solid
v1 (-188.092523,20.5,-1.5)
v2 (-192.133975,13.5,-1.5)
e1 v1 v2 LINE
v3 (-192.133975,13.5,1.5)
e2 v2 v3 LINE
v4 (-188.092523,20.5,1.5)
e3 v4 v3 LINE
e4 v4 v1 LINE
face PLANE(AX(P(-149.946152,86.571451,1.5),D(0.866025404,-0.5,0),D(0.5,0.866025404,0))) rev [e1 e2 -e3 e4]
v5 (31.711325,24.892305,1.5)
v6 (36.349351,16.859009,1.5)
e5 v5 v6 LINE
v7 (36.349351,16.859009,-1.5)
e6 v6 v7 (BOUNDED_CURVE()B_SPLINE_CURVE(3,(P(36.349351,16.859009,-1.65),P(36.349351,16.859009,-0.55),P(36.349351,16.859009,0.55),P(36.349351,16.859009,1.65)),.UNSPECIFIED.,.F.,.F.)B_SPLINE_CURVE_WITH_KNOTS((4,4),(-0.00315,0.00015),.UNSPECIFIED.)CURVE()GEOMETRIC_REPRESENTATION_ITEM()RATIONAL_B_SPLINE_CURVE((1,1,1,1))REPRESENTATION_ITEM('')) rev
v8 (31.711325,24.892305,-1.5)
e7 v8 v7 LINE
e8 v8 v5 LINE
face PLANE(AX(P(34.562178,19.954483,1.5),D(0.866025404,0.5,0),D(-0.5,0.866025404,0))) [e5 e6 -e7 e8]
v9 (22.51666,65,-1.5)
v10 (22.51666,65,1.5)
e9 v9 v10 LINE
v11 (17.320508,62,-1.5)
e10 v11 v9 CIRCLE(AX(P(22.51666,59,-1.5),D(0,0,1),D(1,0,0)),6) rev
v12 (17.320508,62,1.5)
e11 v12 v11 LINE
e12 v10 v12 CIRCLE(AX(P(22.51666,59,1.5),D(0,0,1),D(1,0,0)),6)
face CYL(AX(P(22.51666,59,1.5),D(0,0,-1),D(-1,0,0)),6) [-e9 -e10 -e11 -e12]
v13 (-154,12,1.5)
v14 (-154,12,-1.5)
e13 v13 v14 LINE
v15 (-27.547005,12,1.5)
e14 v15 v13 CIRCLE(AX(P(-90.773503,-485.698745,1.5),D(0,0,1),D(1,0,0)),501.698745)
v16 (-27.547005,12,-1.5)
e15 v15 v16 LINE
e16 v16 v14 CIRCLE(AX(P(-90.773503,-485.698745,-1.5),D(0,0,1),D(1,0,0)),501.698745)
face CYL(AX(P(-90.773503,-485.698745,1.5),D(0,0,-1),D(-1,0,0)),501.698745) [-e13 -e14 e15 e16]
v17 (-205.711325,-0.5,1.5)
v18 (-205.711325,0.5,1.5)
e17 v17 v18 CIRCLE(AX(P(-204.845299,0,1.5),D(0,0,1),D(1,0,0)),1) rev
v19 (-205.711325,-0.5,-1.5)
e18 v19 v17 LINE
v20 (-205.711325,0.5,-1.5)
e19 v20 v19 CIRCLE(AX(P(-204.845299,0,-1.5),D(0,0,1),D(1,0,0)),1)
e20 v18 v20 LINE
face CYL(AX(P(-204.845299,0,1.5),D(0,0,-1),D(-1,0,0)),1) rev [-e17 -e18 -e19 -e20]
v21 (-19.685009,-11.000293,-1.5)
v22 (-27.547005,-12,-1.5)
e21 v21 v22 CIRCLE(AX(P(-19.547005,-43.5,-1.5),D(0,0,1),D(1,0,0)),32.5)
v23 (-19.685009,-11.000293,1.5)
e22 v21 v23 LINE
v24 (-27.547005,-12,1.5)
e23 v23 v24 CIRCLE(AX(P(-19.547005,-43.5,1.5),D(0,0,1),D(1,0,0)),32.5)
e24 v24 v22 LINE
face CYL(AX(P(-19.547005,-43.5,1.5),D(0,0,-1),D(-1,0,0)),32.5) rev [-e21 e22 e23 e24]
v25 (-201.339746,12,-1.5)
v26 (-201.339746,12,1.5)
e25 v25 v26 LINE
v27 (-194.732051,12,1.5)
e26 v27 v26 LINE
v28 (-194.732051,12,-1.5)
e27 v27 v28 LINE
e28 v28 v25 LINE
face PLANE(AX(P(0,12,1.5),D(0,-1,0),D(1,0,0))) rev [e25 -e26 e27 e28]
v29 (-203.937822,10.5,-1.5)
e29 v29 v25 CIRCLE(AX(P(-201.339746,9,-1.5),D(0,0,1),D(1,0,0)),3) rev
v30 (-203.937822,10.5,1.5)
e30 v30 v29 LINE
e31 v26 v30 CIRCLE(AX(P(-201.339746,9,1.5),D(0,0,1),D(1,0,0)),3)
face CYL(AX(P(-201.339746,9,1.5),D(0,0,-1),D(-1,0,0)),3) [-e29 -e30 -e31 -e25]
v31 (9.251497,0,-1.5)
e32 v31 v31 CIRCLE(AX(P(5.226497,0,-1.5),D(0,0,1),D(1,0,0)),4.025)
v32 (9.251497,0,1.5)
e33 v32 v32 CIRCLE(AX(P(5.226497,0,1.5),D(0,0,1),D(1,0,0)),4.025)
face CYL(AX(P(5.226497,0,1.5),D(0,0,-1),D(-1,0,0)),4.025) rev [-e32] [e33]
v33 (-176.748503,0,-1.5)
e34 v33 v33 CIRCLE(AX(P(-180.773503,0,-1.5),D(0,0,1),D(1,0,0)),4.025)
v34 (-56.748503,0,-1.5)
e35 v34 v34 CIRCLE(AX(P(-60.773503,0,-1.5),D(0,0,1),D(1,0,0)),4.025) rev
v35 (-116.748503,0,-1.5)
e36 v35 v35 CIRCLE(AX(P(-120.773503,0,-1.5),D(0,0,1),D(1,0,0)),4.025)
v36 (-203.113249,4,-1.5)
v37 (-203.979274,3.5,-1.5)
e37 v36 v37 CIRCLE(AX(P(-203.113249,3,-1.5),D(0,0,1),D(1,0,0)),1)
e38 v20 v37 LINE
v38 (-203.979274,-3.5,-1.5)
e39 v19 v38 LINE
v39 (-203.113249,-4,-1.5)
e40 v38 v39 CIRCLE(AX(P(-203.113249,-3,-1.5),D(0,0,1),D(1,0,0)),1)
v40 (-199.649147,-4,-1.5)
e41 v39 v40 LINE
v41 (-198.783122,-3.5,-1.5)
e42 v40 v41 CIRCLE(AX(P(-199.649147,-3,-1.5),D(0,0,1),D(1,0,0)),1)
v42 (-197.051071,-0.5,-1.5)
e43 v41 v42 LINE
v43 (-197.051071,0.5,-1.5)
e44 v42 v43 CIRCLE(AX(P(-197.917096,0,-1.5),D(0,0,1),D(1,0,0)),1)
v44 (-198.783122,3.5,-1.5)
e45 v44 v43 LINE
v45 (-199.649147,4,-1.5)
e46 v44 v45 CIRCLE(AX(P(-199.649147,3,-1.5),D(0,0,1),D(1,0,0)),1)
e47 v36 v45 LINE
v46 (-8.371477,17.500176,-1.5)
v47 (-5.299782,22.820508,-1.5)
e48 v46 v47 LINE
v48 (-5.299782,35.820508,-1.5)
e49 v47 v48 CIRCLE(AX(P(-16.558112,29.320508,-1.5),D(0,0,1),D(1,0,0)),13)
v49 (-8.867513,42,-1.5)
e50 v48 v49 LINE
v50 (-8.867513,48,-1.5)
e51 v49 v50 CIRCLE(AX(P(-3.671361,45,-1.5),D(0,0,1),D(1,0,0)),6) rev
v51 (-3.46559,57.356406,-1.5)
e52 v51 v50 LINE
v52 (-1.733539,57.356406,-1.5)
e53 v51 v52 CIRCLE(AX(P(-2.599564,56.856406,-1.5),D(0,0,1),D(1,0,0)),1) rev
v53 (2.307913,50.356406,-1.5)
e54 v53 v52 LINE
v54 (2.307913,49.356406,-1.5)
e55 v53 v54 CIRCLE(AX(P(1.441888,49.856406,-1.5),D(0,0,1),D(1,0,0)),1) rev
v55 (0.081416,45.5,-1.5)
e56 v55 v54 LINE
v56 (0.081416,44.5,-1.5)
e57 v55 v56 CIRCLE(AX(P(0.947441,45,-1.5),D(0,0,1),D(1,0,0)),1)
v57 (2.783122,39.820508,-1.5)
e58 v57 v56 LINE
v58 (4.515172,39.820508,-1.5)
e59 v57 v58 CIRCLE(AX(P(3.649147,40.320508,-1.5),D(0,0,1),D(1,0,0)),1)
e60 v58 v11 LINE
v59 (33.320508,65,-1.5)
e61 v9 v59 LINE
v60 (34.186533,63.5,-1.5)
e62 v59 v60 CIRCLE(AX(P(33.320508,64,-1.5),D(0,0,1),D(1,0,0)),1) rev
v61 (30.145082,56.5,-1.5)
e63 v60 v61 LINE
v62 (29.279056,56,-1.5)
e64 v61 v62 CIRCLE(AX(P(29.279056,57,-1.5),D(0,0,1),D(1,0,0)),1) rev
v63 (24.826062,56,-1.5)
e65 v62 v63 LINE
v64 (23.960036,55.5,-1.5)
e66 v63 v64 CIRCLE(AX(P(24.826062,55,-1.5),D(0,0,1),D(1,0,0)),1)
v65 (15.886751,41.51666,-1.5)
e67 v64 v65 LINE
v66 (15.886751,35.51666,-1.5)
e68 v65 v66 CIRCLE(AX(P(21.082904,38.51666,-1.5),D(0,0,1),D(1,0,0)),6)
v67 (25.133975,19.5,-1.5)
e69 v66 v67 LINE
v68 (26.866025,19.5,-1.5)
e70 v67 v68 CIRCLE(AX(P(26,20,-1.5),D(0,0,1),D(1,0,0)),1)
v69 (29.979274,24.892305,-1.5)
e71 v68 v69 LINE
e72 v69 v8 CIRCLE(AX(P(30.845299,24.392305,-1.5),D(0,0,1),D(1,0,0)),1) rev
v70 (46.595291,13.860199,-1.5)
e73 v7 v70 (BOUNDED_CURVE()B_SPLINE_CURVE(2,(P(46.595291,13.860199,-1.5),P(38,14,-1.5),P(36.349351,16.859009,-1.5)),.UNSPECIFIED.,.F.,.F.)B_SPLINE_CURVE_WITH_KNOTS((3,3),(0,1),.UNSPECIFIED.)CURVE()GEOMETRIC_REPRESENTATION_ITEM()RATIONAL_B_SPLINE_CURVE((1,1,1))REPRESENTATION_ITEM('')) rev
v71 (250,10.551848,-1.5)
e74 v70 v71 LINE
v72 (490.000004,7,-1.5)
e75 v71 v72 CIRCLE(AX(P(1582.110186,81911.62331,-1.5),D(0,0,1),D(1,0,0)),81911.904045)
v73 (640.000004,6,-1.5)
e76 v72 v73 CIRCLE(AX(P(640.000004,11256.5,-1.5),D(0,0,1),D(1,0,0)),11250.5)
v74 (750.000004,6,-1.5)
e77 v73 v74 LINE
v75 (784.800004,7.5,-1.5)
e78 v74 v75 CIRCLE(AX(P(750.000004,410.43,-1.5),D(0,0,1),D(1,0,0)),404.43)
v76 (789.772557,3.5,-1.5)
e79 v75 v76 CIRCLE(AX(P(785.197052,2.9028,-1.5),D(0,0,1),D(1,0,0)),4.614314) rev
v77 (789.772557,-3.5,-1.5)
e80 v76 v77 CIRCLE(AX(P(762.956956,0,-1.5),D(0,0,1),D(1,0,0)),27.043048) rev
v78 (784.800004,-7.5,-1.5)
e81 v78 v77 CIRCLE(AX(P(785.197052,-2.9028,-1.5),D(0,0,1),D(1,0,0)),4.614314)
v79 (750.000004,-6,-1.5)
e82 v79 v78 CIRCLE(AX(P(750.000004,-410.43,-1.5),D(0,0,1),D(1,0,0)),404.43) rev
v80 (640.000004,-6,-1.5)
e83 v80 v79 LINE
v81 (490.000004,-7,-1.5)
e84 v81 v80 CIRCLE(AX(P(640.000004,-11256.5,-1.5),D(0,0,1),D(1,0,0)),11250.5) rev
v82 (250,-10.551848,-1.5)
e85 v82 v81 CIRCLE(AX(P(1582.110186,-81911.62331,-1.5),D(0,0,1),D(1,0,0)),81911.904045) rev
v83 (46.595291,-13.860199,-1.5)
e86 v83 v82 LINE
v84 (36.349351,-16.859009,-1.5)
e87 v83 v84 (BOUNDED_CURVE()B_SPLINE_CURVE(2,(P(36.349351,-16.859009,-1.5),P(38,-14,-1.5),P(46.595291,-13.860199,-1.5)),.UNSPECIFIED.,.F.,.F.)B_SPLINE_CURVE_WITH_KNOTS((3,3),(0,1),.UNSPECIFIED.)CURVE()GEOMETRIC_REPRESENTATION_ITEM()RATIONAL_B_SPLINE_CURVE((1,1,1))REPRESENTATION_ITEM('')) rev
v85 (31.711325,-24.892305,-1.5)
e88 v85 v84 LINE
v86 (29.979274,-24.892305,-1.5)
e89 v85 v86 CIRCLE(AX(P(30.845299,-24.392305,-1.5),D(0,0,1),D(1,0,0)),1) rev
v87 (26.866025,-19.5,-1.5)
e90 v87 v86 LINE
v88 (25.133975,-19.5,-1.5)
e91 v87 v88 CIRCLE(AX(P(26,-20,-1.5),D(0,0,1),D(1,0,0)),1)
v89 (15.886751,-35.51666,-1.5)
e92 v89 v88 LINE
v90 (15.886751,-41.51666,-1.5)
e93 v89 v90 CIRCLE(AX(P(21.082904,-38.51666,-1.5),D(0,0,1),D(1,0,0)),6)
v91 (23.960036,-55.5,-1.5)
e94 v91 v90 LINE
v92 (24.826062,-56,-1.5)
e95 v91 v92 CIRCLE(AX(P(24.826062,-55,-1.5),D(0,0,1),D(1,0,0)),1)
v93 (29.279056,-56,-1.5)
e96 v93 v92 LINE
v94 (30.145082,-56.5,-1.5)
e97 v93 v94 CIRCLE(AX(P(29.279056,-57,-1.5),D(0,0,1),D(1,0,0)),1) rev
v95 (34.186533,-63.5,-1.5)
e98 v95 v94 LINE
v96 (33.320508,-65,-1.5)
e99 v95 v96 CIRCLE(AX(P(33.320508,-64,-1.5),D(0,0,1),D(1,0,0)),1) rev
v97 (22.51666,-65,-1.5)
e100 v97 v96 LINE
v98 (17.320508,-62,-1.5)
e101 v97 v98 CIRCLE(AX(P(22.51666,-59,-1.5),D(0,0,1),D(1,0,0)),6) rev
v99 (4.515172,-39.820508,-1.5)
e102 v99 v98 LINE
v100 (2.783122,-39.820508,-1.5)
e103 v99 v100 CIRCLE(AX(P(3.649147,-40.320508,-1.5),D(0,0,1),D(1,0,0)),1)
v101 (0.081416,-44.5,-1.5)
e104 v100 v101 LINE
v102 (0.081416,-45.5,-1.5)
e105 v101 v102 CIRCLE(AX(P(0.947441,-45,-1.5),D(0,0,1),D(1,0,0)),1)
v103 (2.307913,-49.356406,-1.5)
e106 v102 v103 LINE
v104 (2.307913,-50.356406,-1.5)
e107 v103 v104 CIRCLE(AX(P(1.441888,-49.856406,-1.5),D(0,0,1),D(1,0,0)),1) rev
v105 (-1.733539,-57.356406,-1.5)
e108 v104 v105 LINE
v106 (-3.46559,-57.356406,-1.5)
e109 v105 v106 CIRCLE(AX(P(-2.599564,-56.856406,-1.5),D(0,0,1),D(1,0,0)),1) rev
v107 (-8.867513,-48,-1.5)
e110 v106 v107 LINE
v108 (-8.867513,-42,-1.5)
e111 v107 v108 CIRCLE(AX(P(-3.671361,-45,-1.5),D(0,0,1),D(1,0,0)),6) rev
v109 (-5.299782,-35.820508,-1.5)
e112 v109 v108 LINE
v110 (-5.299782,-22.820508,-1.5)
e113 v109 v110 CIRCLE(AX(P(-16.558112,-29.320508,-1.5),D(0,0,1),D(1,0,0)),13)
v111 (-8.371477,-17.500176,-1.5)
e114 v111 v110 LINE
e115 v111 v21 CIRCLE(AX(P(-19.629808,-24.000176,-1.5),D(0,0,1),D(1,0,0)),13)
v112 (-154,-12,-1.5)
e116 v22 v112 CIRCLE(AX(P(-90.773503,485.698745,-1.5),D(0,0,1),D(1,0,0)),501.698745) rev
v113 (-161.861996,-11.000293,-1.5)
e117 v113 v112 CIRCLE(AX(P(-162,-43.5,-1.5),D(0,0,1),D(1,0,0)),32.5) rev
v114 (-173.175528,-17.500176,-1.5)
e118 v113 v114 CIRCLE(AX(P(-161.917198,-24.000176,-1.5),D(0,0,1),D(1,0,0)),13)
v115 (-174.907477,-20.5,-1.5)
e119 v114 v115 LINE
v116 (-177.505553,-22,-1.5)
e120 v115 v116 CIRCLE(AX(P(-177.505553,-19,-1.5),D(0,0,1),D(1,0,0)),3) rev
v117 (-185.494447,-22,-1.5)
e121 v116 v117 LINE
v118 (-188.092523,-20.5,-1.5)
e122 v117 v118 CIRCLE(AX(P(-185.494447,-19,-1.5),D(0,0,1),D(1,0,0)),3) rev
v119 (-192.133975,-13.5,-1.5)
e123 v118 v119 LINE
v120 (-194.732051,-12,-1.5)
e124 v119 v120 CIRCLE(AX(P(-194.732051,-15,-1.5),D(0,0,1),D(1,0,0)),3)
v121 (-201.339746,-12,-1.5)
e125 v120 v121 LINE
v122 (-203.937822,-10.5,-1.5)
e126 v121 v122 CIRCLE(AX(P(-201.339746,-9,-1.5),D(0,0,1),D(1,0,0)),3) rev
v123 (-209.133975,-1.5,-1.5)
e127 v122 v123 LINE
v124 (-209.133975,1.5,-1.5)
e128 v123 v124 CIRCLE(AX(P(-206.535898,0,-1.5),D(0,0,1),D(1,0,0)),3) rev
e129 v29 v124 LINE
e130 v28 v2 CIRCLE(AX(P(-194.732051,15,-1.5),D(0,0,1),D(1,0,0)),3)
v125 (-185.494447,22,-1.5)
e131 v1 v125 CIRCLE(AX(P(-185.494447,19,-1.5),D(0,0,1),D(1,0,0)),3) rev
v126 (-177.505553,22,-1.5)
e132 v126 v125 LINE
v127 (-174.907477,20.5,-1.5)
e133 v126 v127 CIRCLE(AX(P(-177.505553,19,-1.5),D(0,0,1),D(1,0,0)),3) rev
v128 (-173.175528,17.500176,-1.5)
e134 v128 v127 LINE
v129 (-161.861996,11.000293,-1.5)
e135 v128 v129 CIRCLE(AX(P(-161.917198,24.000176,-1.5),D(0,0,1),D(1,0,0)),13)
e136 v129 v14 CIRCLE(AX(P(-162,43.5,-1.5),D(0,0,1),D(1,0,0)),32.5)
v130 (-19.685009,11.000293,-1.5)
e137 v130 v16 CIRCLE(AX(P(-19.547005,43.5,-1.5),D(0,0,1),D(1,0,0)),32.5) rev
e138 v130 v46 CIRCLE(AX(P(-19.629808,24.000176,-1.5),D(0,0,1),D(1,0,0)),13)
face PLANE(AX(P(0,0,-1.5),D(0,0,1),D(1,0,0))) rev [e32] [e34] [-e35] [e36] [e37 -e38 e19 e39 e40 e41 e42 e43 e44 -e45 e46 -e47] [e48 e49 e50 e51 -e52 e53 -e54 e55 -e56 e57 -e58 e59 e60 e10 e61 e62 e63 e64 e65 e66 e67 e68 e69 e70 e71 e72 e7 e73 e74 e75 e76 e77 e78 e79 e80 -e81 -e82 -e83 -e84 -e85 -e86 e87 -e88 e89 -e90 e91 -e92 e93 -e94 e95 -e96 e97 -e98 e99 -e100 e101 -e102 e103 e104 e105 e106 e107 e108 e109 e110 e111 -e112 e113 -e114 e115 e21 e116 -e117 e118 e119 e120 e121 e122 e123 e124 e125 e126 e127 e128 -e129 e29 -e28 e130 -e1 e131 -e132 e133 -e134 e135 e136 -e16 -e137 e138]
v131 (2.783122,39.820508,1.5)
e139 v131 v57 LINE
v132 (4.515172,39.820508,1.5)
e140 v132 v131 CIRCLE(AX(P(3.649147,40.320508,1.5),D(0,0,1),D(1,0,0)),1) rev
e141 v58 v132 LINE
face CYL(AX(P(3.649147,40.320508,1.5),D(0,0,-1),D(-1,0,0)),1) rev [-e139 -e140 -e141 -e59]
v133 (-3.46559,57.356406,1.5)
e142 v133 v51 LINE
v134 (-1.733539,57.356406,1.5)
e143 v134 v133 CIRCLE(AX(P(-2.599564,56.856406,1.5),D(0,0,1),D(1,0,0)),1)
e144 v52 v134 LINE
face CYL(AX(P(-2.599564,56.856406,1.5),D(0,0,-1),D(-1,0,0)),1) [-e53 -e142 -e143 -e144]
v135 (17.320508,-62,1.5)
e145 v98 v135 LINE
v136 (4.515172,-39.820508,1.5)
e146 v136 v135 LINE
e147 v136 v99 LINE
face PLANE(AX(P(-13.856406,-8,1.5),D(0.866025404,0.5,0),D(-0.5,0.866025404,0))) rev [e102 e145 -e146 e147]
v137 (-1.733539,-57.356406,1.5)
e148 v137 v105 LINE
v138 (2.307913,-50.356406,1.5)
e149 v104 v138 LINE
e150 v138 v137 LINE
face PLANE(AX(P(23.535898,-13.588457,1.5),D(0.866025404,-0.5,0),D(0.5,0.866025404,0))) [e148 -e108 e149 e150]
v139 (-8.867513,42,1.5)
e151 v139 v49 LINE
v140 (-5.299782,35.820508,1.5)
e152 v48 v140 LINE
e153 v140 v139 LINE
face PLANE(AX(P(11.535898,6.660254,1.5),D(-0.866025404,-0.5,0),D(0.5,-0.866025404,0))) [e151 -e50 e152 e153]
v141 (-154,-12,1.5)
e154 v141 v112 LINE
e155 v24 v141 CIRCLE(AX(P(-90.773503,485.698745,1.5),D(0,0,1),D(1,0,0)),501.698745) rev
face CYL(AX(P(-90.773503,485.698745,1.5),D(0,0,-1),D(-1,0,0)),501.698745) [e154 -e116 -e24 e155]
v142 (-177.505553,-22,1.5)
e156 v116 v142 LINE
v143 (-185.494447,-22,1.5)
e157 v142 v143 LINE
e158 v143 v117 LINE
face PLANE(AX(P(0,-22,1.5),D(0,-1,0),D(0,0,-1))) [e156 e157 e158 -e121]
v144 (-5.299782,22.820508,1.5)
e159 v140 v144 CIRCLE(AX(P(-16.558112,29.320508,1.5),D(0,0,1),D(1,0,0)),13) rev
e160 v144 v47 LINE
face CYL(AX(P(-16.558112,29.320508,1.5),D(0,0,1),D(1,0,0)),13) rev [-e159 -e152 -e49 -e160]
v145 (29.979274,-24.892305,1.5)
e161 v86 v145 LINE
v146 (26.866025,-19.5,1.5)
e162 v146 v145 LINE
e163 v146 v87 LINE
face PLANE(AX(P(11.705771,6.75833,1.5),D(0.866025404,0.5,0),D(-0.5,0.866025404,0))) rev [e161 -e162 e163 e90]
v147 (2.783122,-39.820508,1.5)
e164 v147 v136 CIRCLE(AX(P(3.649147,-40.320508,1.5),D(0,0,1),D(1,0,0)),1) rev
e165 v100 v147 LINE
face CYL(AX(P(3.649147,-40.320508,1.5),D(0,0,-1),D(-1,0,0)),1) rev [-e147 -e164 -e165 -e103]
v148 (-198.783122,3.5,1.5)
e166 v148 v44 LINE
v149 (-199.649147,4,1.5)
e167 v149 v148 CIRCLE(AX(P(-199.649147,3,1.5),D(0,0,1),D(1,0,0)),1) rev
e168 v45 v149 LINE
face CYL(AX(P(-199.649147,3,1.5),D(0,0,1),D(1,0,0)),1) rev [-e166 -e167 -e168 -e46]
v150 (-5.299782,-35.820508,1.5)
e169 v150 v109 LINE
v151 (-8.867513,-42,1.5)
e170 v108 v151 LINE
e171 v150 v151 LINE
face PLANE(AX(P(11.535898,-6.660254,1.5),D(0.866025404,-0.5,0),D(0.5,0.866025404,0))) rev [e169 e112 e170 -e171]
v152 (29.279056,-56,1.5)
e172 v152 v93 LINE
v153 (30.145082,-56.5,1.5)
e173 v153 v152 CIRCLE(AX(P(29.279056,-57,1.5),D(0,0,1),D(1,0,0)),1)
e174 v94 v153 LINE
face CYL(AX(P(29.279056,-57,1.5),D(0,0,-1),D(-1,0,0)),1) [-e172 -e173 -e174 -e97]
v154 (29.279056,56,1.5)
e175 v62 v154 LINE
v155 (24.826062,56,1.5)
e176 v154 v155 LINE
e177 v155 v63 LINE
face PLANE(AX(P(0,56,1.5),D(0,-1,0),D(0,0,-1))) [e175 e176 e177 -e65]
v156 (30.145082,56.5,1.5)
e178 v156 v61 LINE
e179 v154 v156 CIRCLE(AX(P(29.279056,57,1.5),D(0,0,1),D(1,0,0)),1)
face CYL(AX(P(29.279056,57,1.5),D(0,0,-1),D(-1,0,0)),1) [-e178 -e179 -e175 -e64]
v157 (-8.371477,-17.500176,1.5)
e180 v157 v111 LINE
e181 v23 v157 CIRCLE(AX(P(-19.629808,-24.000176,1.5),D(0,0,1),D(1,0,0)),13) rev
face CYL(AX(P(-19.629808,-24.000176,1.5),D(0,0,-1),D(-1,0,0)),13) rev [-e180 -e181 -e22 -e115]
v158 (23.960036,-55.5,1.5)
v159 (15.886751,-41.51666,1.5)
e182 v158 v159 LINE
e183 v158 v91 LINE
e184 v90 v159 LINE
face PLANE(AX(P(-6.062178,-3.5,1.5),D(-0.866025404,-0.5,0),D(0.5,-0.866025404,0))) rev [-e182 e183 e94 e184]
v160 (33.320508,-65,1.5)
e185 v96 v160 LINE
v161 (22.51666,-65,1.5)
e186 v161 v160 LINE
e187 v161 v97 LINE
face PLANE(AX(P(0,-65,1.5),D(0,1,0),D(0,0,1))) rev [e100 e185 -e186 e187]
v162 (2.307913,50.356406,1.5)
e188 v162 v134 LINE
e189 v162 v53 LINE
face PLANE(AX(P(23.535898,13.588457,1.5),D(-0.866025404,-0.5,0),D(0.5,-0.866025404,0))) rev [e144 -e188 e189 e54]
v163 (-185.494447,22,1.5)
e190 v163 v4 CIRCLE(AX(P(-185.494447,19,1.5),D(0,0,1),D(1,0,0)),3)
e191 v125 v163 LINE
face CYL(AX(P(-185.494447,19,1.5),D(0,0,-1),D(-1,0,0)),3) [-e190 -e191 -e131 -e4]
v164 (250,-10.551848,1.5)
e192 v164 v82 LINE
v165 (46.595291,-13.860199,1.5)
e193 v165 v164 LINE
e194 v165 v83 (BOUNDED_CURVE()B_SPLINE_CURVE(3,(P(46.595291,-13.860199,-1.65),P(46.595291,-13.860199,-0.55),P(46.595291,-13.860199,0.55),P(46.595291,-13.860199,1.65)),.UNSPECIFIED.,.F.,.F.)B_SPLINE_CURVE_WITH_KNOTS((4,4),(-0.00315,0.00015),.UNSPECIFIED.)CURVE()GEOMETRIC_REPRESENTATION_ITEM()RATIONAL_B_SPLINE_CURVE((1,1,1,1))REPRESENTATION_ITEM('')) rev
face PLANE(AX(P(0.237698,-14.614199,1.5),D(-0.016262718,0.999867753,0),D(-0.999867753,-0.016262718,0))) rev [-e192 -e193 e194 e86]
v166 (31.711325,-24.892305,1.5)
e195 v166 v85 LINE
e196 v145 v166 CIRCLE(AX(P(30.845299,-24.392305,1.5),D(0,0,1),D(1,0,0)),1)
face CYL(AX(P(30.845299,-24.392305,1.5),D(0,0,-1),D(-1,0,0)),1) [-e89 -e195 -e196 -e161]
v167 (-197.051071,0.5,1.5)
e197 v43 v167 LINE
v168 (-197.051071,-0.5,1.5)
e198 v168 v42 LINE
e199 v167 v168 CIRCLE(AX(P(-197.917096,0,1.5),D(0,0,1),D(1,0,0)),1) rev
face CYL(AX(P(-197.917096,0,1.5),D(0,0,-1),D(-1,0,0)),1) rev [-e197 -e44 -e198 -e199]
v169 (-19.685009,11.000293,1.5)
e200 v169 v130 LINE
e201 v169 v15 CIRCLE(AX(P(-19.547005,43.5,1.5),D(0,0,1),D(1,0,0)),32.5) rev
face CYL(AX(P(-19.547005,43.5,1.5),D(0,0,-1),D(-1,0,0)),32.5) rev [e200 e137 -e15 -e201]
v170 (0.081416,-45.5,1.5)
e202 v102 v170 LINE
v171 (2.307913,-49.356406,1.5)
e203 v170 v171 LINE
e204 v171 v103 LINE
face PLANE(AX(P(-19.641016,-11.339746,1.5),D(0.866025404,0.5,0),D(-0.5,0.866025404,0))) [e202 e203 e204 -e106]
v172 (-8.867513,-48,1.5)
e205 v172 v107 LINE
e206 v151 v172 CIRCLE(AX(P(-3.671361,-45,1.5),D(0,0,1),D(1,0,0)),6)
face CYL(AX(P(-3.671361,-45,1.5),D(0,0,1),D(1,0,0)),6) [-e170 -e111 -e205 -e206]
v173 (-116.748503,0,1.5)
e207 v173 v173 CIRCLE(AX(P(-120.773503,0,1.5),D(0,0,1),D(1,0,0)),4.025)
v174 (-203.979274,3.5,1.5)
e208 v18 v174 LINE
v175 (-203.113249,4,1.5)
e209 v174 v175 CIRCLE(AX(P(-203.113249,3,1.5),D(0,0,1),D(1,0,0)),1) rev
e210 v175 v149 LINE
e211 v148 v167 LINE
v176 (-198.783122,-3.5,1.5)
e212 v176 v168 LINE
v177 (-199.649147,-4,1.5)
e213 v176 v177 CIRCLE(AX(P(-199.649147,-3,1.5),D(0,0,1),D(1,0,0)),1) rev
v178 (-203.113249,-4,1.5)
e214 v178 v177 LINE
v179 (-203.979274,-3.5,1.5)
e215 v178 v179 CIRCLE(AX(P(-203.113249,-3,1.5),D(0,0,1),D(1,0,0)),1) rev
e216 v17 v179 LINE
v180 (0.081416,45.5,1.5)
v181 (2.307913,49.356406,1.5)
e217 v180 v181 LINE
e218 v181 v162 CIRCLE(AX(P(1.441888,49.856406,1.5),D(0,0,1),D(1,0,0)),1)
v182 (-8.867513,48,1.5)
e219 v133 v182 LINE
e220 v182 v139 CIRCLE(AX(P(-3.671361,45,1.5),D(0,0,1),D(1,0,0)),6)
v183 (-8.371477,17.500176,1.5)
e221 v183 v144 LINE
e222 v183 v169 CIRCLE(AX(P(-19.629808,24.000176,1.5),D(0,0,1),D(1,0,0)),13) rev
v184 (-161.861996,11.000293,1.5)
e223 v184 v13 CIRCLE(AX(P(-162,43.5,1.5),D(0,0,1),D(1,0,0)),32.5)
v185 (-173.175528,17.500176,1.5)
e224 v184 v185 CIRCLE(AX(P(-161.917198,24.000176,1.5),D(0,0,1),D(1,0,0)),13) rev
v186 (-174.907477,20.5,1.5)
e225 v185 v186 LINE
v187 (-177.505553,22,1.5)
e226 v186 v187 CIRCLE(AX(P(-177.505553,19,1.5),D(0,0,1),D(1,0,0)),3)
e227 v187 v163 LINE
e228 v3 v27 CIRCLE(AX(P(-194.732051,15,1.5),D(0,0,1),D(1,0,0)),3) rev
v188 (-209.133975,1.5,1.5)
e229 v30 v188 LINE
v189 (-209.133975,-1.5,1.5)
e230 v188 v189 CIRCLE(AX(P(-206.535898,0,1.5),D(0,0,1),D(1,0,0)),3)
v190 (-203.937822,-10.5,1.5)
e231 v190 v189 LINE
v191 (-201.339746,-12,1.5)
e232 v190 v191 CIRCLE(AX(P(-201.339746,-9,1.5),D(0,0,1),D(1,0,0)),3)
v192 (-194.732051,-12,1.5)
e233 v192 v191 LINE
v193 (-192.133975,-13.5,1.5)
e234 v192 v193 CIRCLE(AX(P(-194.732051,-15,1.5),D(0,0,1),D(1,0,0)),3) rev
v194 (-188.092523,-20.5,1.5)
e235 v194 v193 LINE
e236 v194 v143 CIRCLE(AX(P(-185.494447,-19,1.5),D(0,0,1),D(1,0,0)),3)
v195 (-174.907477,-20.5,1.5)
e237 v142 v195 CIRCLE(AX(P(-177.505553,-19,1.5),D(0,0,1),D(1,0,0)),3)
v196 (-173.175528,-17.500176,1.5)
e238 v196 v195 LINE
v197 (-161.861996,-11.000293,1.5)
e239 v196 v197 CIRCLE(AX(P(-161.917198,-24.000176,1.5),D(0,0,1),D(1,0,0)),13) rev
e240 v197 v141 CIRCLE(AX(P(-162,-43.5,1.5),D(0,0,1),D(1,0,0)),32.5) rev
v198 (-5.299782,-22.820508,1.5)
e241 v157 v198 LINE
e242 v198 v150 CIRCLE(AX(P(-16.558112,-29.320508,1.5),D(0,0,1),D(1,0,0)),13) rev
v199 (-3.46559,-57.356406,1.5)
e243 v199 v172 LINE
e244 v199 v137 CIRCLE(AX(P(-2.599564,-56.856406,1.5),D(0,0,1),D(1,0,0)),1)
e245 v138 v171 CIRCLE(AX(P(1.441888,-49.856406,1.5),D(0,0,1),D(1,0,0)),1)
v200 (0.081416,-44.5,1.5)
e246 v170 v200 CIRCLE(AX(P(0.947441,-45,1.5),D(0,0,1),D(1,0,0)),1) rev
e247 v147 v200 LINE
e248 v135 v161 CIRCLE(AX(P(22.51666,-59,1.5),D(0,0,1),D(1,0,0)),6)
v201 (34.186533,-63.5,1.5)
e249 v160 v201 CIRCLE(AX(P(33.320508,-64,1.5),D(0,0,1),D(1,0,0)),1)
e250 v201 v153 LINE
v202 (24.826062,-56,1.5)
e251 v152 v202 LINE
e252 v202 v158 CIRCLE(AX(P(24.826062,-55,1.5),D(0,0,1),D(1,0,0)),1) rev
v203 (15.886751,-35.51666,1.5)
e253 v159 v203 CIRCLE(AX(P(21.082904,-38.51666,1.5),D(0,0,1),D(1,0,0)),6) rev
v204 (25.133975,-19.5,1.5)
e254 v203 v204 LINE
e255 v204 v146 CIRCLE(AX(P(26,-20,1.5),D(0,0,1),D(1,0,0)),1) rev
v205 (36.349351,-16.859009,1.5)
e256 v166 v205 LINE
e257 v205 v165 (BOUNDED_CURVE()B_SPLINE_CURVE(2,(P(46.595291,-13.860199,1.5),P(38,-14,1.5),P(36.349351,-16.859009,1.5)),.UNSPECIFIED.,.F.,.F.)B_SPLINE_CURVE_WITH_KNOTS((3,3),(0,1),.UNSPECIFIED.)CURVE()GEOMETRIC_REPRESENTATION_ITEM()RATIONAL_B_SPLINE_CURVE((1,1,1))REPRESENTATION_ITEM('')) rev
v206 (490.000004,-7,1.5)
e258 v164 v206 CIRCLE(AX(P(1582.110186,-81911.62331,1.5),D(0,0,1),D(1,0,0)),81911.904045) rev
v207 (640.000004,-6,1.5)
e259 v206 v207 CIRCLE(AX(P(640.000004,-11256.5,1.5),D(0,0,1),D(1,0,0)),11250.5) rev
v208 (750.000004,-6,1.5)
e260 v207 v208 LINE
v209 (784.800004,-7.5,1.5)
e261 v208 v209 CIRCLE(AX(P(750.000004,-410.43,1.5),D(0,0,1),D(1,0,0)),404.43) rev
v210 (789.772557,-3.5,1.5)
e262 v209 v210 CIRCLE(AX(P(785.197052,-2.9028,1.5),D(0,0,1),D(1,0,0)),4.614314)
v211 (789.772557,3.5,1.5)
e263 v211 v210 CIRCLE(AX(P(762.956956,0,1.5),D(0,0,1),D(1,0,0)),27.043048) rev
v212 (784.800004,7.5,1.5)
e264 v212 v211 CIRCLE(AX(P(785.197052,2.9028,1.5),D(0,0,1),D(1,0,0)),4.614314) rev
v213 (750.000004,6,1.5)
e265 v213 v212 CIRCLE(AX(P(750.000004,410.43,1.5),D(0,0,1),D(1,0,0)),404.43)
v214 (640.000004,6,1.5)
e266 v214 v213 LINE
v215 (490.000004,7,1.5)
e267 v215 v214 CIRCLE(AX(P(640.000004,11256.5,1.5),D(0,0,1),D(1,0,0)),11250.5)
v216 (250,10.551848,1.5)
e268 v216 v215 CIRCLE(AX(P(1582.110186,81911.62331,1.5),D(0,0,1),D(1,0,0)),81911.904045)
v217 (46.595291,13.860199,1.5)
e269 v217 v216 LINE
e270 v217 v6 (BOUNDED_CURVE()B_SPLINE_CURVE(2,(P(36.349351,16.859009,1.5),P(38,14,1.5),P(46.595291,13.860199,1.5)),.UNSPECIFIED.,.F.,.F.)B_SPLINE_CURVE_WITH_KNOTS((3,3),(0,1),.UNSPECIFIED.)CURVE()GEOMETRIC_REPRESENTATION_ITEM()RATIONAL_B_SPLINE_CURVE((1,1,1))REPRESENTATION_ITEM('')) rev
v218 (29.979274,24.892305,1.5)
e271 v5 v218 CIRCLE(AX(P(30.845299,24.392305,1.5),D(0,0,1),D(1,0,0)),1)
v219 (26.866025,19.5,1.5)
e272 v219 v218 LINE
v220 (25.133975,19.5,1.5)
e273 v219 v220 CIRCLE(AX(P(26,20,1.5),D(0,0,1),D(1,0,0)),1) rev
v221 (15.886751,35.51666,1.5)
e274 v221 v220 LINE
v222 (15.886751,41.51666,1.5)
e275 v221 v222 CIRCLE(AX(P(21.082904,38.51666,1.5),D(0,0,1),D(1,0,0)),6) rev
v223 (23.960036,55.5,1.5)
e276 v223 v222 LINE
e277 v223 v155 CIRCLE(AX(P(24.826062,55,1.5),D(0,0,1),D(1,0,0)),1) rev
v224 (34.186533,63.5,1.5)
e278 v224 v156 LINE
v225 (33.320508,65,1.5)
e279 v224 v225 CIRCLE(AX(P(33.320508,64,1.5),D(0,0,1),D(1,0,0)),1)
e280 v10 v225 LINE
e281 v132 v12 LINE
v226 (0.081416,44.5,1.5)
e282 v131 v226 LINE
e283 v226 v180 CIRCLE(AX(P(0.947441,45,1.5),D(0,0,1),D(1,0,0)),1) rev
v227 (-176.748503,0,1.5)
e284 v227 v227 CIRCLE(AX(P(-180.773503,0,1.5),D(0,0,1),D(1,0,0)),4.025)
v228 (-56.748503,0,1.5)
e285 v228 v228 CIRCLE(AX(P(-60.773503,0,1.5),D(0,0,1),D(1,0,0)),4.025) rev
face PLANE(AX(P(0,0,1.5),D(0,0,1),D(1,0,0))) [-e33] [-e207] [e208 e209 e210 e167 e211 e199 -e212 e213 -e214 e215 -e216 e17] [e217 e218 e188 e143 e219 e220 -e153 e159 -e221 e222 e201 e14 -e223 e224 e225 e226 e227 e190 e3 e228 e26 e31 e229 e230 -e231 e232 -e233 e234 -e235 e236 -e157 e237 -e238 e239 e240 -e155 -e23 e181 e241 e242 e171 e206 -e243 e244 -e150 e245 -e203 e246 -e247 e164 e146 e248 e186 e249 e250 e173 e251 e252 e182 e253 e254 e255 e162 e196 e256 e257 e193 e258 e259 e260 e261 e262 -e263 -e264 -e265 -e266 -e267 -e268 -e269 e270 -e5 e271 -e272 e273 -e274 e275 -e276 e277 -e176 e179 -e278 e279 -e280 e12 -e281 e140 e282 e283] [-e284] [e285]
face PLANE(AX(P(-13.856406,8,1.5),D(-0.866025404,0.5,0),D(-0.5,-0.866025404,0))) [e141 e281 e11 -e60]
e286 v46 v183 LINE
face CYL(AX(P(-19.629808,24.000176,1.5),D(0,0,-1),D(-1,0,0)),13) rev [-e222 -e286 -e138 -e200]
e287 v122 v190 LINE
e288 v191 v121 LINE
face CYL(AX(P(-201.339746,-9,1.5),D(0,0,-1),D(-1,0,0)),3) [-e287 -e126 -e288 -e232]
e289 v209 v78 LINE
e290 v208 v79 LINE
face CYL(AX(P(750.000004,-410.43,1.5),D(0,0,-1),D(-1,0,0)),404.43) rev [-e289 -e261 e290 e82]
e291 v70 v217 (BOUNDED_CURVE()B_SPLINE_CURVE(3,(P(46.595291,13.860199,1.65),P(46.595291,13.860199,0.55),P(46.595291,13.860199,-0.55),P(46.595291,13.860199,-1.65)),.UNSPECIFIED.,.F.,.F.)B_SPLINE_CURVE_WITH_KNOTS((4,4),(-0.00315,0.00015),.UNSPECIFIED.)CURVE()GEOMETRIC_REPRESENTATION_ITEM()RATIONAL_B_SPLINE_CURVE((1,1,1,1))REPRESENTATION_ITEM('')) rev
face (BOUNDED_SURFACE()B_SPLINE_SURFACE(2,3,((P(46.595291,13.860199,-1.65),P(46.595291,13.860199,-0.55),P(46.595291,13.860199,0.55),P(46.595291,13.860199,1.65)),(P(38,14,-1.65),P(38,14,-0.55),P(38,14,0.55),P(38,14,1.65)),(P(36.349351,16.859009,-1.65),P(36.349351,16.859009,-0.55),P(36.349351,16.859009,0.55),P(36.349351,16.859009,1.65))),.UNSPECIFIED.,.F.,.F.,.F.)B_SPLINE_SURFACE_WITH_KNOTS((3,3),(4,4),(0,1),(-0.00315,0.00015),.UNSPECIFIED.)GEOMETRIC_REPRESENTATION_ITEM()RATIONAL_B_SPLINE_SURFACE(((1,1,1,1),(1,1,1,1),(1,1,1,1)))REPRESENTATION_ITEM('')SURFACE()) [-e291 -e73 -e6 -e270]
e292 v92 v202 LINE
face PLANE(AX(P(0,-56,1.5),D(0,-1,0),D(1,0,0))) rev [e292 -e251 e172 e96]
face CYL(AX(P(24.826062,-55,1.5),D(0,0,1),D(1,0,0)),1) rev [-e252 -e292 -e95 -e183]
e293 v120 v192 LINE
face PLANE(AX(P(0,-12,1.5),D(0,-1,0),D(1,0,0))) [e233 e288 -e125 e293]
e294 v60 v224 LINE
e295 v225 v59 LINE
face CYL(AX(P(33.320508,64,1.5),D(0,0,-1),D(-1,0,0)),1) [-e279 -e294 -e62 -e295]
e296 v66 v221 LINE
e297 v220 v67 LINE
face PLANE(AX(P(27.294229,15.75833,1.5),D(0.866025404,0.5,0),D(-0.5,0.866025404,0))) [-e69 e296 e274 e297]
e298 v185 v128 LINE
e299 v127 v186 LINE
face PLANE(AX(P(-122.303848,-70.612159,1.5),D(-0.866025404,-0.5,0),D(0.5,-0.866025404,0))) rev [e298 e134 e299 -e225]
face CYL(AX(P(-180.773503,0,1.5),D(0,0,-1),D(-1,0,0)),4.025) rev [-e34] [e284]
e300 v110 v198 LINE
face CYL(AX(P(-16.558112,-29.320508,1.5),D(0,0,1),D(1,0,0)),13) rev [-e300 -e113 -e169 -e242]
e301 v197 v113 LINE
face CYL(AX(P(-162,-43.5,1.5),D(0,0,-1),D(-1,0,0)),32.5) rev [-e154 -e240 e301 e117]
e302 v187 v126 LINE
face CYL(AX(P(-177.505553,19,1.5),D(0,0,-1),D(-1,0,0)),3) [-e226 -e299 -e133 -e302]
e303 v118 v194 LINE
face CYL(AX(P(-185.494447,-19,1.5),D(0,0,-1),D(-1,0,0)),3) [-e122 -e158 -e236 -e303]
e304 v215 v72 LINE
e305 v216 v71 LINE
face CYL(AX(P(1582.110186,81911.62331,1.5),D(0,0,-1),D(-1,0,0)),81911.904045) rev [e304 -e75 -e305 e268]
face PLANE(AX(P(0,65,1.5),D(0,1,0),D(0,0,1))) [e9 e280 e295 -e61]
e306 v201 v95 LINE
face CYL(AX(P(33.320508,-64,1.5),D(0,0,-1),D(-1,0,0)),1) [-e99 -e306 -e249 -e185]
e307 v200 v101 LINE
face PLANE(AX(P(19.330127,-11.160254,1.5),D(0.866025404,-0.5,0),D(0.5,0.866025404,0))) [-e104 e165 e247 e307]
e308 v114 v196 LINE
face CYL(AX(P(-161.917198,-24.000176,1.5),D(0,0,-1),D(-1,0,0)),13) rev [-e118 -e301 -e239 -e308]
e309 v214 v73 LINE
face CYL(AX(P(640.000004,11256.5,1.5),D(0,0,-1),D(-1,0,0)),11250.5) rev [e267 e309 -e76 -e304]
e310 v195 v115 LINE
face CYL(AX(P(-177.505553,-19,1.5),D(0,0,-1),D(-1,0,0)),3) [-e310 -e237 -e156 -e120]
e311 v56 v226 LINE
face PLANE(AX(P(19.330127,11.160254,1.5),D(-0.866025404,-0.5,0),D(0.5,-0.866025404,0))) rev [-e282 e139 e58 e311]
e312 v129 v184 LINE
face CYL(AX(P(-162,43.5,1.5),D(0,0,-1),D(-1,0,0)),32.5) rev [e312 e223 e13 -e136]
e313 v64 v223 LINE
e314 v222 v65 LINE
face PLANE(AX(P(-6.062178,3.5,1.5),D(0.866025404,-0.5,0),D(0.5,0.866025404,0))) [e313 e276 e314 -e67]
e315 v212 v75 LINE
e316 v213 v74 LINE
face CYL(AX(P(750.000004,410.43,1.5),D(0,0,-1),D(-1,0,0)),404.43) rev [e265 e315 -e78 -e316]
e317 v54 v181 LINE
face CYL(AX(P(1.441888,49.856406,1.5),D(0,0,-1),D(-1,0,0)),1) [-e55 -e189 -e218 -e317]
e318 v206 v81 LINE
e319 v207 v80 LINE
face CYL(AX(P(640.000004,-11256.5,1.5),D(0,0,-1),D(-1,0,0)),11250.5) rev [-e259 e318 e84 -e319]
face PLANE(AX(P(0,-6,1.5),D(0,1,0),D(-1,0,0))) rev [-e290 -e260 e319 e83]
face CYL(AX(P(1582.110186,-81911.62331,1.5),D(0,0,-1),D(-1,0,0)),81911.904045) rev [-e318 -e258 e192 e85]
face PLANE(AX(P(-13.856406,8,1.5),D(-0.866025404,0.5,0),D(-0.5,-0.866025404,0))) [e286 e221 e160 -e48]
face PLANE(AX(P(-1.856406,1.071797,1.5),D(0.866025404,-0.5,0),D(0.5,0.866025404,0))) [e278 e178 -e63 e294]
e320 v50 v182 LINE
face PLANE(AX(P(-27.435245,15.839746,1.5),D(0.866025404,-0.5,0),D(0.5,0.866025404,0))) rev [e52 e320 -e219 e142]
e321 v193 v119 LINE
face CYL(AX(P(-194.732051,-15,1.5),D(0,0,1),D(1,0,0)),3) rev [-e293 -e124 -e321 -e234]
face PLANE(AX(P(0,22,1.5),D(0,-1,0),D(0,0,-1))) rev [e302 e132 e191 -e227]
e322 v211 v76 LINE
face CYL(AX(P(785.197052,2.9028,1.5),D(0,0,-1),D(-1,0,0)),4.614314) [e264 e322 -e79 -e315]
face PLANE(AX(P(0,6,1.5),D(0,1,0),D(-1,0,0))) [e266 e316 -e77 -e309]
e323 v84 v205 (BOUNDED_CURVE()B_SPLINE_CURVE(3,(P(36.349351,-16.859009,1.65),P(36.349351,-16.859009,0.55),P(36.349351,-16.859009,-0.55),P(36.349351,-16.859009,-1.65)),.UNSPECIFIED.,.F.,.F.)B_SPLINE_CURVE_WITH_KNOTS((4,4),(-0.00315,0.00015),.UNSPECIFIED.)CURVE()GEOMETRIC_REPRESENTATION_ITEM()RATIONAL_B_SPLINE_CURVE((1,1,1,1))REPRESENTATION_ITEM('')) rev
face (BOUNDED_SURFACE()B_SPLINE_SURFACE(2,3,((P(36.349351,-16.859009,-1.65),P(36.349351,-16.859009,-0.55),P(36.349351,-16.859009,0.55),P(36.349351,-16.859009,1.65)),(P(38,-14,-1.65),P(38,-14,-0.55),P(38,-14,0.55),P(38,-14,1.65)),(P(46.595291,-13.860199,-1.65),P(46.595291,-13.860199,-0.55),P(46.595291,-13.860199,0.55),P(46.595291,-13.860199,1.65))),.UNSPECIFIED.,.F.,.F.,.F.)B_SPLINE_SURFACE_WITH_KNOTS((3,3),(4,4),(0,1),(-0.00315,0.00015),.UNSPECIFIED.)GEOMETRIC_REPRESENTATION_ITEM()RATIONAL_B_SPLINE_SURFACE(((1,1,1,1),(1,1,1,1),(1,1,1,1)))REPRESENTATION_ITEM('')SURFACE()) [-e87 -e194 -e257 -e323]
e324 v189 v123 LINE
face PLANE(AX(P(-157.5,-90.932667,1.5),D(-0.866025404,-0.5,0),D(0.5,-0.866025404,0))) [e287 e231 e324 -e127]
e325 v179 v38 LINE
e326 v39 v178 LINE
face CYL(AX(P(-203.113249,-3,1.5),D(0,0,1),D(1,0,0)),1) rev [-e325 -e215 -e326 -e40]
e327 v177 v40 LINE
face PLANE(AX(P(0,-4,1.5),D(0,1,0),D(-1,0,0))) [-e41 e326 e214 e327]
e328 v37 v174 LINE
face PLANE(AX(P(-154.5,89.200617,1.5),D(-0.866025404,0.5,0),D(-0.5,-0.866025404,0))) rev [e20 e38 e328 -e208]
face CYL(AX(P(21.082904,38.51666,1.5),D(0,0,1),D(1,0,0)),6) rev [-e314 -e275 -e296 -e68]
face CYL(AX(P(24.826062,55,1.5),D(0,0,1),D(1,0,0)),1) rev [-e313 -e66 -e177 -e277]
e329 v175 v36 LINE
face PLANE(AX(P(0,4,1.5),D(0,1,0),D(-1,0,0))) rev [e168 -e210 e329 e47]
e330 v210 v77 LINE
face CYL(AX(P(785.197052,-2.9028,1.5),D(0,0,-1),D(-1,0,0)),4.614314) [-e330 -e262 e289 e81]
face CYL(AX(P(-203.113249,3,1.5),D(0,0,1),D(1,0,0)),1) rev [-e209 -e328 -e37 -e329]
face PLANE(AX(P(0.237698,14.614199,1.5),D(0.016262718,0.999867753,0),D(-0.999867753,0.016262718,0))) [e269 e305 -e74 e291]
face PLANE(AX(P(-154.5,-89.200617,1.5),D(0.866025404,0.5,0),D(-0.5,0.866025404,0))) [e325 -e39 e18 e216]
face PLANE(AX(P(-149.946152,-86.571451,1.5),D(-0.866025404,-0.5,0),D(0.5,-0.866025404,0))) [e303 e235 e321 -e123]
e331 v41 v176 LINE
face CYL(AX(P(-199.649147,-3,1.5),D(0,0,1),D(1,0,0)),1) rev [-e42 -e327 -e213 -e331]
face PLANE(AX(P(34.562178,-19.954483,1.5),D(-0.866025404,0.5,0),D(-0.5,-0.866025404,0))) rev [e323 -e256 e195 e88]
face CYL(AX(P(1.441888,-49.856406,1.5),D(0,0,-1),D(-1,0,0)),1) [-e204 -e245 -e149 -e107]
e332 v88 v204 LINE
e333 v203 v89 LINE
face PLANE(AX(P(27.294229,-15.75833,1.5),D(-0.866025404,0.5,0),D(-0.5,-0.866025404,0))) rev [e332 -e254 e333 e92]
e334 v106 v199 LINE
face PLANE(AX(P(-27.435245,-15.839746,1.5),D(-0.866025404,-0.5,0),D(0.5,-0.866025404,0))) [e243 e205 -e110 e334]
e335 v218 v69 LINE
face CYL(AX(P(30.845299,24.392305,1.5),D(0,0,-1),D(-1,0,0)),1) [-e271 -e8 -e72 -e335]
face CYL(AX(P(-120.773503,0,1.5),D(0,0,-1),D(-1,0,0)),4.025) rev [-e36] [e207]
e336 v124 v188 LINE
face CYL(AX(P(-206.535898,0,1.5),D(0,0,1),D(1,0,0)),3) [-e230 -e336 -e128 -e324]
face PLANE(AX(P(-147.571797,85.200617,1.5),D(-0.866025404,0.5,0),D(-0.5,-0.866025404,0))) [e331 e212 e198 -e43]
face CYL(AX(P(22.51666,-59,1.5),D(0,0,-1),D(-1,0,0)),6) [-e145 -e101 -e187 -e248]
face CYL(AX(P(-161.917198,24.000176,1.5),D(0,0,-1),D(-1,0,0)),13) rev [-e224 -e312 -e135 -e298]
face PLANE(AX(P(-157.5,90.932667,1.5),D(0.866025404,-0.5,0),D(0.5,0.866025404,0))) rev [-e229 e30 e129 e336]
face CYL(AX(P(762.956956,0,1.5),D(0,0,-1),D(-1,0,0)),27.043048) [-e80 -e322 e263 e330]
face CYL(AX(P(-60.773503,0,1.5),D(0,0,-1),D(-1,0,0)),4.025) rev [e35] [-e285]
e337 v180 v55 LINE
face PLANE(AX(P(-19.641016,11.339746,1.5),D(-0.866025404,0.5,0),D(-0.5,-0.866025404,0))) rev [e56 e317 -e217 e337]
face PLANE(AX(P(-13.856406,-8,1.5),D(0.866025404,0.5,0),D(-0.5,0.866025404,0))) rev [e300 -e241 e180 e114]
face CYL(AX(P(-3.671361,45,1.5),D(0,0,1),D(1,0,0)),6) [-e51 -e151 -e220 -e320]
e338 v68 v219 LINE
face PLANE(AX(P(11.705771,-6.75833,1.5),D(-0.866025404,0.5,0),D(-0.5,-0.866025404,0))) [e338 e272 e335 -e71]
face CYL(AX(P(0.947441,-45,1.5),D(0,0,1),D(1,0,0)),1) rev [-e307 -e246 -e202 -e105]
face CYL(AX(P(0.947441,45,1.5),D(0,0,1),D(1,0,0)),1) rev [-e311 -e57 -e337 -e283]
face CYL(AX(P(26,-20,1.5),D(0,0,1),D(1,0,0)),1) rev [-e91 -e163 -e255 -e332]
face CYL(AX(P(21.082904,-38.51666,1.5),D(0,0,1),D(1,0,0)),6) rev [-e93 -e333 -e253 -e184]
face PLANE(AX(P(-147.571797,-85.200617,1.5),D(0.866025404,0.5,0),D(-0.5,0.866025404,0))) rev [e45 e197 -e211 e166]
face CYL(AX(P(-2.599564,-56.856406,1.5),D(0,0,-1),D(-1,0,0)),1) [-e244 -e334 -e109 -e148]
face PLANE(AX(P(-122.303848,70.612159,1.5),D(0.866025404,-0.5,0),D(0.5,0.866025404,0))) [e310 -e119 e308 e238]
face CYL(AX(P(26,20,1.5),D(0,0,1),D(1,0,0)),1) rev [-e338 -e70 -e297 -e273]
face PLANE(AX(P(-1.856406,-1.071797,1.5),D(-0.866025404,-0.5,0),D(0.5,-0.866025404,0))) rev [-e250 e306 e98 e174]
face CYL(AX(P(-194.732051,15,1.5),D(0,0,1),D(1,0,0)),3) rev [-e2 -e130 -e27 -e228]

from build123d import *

# Parameters (mm, degrees)
SKETCH_1_R      = 4.025
EXTRUDE_1_DEPTH = 1.5
FILLET_1_R      = 13
FILLET_2_R      = 6
FILLET_3_R      = 1
FILLET_7_R      = 3


with BuildPart() as part:
    # 草图1 → 凸台-拉伸1 (new, symmetric)
    with BuildSketch(Plane.XY):
        with BuildLine():
            Line((38, 14.000000007), (250, 10.55184781))
            ThreePointArc((250, 10.55184781), (369.998701007, 8.688014918), (490.000004009, 7))
            ThreePointArc((490.000004009, 7), (564.99833736, 6.250002778), (640.000004009, 6))
            Line((640.000004009, 6), (750.000004009, 6))
            ThreePointArc((750.000004009, 6), (767.416160301, 6.375174017), (784.800004009, 7.5))
            ThreePointArc((784.800004009, 7.5), (788.089261415, 6.498216371), (789.772556789, 3.5))
            ThreePointArc((789.772556789, 3.5), (790.000004009, 0), (789.772556789, -3.5))
            ThreePointArc((789.772556789, -3.5), (788.089261415, -6.498216371), (784.800004009, -7.5))
            ThreePointArc((784.800004009, -7.5), (767.416160301, -6.375174017), (750.000004009, -6))
            Line((750.000004009, -6), (640.000004009, -6))
            ThreePointArc((640.000004009, -6), (564.99833736, -6.250002778), (490.000004009, -7))
            ThreePointArc((490.000004009, -7), (369.998701007, -8.688014918), (250, -10.55184781))
            Line((250, -10.55184781), (38, -14.000000007))
            Line((38, -14.000000007), (30.845299463, -26.392304848))
            Line((30.845299463, -26.392304848), (26, -18))
            Line((26, -18), (14.154700538, -38.516660498))
            Line((14.154700538, -38.516660498), (24.248711306, -56))
            Line((24.248711306, -56), (29.856406461, -56))
            Line((29.856406461, -56), (35.052558882, -65))
            Line((35.052558882, -65), (19.052558883, -65))
            Line((19.052558883, -65), (3.649147039, -38.320508076))
            Line((3.649147039, -38.320508076), (-0.207259422, -45))
            Line((-0.207259422, -45), (2.596588156, -49.856406461))
            Line((2.596588156, -49.856406461), (-2.599564267, -58.856406461))
            Line((-2.599564267, -58.856406461), (-10.599564267, -45))
            Line((-10.599564267, -45), (-1.547005384, -29.320508076))
            Line((-1.547005384, -29.320508076), (-11.547005384, -12))
            ThreePointArc((-11.547005384, -12), (-19.547005384, -11), (-27.547005384, -12))
            ThreePointArc((-27.547005384, -12), (-90.773502692, -16), (-154, -12))
            ThreePointArc((-154, -12), (-162, -11), (-170, -12))
            Line((-170, -12), (-175.773502692, -22))
            Line((-175.773502692, -22), (-187.226497308, -22))
            Line((-187.226497308, -22), (-193, -12))
            Line((-193, -12), (-203.07179677, -12))
            Line((-203.07179677, -12), (-210, 0))
            Line((-210, 0), (-203.071796768, 12))
            Line((-203.071796768, 12), (-193, 12))
            Line((-193, 12), (-187.226497308, 22))
            Line((-187.226497308, 22), (-175.773502689, 22))
            Line((-175.773502689, 22), (-170, 12))
            ThreePointArc((-170, 12), (-162, 11), (-154, 12))
            ThreePointArc((-154, 12), (-90.773502692, 16), (-27.547005384, 12))
            ThreePointArc((-27.547005384, 12), (-19.547005384, 11), (-11.547005384, 12))
            Line((-11.547005384, 12), (-1.547005384, 29.320508076))
            Line((-1.547005384, 29.320508076), (-10.599564267, 45))
            Line((-10.599564267, 45), (-2.599564267, 58.856406461))
            Line((-2.599564267, 58.856406461), (2.596588156, 49.856406461))
            Line((2.596588156, 49.856406461), (-0.207259422, 45))
            Line((-0.207259422, 45), (3.649147039, 38.320508076))
            Line((3.649147039, 38.320508076), (19.052558883, 65))
            Line((19.052558883, 65), (35.052558883, 65))
            Line((35.052558883, 65), (29.856406461, 56))
            Line((29.856406461, 56), (24.248711306, 56))
            Line((24.248711306, 56), (14.154700538, 38.516660498))
            Line((14.154700538, 38.516660498), (26, 18))
            Line((26, 18), (30.845299464, 26.392304849))
            Line((30.845299464, 26.392304849), (38, 14.000000007))
        make_face()
        with Locations((-120.773502692, 0)):
            Circle(SKETCH_1_R, mode=Mode.SUBTRACT)
        with Locations((-60.773502692, 0)):
            Circle(SKETCH_1_R, mode=Mode.SUBTRACT)
        with Locations((-180.773502692, 0)):
            Circle(SKETCH_1_R, mode=Mode.SUBTRACT)
        with Locations((5.226497308, 0)):
            Circle(SKETCH_1_R, mode=Mode.SUBTRACT)
        Polygon((-206, 0), (-203.690598923, 4), (-199.07179677, 4), (-196.762395693, 0), (-199.07179677, -4), (-203.690598923, -4), align=None, mode=Mode.SUBTRACT)
    extrude(amount=EXTRUDE_1_DEPTH, both=True)

    # 圆角1
    fillet_1_edges = [part.edges().sort_by_distance(p)[0] for p in [
        (-1.547005384, -29.320508076, 0),
        (-11.547005384, -12, 0),
        (-170, -12, 0),
        (-170, 12, 0),
        (-11.547005384, 12, 0),
        (-1.547005384, 29.320508076, 0),
    ]]
    fillet(fillet_1_edges, radius=FILLET_1_R)

    # 圆角2
    fillet_2_edges = [part.edges().sort_by_distance(p)[0] for p in [
        (14.154700538, -38.516660498, 0),
        (19.052558883, -65, 0),
        (-10.599564267, -45, 0),
        (-10.599564267, 45, 0),
        (19.052558883, 65, 0),
        (14.154700538, 38.516660498, 0),
    ]]
    fillet(fillet_2_edges, radius=FILLET_2_R)

    # 圆角3
    fillet_3_edges = [part.edges().sort_by_distance(p)[0] for p in [
        (-196.762395693, 0, 0),
        (-199.07179677, 4, 0),
        (-203.690598923, 4, 0),
        (-206, 0, 0),
        (-203.690598923, -4, 0),
        (-199.07179677, -4, 0),
        (24.248711306, -56, 0),
        (29.856406461, -56, 0),
        (35.052558882, -65, 0),
        (3.649147039, -38.320508076, 0),
        (-0.207259422, -45, 0),
        (2.596588156, -49.856406461, 0),
        (-2.599564267, -58.856406461, 0),
        (-2.599564267, 58.856406461, 0),
        (2.596588156, 49.856406461, 0),
        (-0.207259422, 45, 0),
        (3.649147039, 38.320508076, 0),
        (35.052558883, 65, 0),
        (29.856406461, 56, 0),
        (24.248711306, 56, 0),
        (26, 18, 0),
        (30.845299464, 26.392304849, 0),
        (30.845299463, -26.392304848, 0),
        (26, -18, 0),
    ]]
    fillet(fillet_3_edges, radius=FILLET_3_R)

    # 圆角5
    # a fillet whose section is not a circle: 12, 9 mm, written as the material it adds along each edge
    with BuildSketch(Plane(origin=(38, -14.000000007, 1.5), x_dir=(0.9998677532589965, 0.016262717878828103, 0), z_dir=(0, 0, -1))) as fillet_5_piece_1:
        with BuildLine():
            Bezier((8.596427908, 0), (0, 0), (-1.696926281, 2.831786358), weights=[1, 1, 1])
            Line((-1.696926281, 2.831786358), (0, 0))
            Line((0, 0), (8.596427908, 0))
        make_face()
    extrude(amount=3)

    # 圆角6
    # a fillet whose section is not a circle: 12, 9 mm, written as the material it adds along each edge
    with BuildSketch(Plane(origin=(38, 14.000000007, 1.5), x_dir=(-0.5000000000000278, 0.8660254037844227, 0), z_dir=(0, 0, -1))) as fillet_6_piece_1:
        with BuildLine():
            Bezier((3.301298651, 0), (0, 0), (-4.418716991, 7.373839769), weights=[1, 1, 1])
            Line((-4.418716991, 7.373839769), (0, 0))
            Line((0, 0), (3.301298651, 0))
        make_face()
    extrude(amount=3)

    # 圆角7
    fillet_7_edges = [part.edges().sort_by_distance(p)[0] for p in [
        (-175.773502692, -22, 0),
        (-187.226497308, -22, 0),
        (-193, -12, 0),
        (-203.07179677, -12, 0),
        (-210, 0, 0),
        (-203.071796768, 12, 0),
        (-193, 12, 0),
        (-187.226497308, 22, 0),
        (-175.773502689, 22, 0),
    ]]
    fillet(fillet_7_edges, radius=FILLET_7_R)


solid = part.part
